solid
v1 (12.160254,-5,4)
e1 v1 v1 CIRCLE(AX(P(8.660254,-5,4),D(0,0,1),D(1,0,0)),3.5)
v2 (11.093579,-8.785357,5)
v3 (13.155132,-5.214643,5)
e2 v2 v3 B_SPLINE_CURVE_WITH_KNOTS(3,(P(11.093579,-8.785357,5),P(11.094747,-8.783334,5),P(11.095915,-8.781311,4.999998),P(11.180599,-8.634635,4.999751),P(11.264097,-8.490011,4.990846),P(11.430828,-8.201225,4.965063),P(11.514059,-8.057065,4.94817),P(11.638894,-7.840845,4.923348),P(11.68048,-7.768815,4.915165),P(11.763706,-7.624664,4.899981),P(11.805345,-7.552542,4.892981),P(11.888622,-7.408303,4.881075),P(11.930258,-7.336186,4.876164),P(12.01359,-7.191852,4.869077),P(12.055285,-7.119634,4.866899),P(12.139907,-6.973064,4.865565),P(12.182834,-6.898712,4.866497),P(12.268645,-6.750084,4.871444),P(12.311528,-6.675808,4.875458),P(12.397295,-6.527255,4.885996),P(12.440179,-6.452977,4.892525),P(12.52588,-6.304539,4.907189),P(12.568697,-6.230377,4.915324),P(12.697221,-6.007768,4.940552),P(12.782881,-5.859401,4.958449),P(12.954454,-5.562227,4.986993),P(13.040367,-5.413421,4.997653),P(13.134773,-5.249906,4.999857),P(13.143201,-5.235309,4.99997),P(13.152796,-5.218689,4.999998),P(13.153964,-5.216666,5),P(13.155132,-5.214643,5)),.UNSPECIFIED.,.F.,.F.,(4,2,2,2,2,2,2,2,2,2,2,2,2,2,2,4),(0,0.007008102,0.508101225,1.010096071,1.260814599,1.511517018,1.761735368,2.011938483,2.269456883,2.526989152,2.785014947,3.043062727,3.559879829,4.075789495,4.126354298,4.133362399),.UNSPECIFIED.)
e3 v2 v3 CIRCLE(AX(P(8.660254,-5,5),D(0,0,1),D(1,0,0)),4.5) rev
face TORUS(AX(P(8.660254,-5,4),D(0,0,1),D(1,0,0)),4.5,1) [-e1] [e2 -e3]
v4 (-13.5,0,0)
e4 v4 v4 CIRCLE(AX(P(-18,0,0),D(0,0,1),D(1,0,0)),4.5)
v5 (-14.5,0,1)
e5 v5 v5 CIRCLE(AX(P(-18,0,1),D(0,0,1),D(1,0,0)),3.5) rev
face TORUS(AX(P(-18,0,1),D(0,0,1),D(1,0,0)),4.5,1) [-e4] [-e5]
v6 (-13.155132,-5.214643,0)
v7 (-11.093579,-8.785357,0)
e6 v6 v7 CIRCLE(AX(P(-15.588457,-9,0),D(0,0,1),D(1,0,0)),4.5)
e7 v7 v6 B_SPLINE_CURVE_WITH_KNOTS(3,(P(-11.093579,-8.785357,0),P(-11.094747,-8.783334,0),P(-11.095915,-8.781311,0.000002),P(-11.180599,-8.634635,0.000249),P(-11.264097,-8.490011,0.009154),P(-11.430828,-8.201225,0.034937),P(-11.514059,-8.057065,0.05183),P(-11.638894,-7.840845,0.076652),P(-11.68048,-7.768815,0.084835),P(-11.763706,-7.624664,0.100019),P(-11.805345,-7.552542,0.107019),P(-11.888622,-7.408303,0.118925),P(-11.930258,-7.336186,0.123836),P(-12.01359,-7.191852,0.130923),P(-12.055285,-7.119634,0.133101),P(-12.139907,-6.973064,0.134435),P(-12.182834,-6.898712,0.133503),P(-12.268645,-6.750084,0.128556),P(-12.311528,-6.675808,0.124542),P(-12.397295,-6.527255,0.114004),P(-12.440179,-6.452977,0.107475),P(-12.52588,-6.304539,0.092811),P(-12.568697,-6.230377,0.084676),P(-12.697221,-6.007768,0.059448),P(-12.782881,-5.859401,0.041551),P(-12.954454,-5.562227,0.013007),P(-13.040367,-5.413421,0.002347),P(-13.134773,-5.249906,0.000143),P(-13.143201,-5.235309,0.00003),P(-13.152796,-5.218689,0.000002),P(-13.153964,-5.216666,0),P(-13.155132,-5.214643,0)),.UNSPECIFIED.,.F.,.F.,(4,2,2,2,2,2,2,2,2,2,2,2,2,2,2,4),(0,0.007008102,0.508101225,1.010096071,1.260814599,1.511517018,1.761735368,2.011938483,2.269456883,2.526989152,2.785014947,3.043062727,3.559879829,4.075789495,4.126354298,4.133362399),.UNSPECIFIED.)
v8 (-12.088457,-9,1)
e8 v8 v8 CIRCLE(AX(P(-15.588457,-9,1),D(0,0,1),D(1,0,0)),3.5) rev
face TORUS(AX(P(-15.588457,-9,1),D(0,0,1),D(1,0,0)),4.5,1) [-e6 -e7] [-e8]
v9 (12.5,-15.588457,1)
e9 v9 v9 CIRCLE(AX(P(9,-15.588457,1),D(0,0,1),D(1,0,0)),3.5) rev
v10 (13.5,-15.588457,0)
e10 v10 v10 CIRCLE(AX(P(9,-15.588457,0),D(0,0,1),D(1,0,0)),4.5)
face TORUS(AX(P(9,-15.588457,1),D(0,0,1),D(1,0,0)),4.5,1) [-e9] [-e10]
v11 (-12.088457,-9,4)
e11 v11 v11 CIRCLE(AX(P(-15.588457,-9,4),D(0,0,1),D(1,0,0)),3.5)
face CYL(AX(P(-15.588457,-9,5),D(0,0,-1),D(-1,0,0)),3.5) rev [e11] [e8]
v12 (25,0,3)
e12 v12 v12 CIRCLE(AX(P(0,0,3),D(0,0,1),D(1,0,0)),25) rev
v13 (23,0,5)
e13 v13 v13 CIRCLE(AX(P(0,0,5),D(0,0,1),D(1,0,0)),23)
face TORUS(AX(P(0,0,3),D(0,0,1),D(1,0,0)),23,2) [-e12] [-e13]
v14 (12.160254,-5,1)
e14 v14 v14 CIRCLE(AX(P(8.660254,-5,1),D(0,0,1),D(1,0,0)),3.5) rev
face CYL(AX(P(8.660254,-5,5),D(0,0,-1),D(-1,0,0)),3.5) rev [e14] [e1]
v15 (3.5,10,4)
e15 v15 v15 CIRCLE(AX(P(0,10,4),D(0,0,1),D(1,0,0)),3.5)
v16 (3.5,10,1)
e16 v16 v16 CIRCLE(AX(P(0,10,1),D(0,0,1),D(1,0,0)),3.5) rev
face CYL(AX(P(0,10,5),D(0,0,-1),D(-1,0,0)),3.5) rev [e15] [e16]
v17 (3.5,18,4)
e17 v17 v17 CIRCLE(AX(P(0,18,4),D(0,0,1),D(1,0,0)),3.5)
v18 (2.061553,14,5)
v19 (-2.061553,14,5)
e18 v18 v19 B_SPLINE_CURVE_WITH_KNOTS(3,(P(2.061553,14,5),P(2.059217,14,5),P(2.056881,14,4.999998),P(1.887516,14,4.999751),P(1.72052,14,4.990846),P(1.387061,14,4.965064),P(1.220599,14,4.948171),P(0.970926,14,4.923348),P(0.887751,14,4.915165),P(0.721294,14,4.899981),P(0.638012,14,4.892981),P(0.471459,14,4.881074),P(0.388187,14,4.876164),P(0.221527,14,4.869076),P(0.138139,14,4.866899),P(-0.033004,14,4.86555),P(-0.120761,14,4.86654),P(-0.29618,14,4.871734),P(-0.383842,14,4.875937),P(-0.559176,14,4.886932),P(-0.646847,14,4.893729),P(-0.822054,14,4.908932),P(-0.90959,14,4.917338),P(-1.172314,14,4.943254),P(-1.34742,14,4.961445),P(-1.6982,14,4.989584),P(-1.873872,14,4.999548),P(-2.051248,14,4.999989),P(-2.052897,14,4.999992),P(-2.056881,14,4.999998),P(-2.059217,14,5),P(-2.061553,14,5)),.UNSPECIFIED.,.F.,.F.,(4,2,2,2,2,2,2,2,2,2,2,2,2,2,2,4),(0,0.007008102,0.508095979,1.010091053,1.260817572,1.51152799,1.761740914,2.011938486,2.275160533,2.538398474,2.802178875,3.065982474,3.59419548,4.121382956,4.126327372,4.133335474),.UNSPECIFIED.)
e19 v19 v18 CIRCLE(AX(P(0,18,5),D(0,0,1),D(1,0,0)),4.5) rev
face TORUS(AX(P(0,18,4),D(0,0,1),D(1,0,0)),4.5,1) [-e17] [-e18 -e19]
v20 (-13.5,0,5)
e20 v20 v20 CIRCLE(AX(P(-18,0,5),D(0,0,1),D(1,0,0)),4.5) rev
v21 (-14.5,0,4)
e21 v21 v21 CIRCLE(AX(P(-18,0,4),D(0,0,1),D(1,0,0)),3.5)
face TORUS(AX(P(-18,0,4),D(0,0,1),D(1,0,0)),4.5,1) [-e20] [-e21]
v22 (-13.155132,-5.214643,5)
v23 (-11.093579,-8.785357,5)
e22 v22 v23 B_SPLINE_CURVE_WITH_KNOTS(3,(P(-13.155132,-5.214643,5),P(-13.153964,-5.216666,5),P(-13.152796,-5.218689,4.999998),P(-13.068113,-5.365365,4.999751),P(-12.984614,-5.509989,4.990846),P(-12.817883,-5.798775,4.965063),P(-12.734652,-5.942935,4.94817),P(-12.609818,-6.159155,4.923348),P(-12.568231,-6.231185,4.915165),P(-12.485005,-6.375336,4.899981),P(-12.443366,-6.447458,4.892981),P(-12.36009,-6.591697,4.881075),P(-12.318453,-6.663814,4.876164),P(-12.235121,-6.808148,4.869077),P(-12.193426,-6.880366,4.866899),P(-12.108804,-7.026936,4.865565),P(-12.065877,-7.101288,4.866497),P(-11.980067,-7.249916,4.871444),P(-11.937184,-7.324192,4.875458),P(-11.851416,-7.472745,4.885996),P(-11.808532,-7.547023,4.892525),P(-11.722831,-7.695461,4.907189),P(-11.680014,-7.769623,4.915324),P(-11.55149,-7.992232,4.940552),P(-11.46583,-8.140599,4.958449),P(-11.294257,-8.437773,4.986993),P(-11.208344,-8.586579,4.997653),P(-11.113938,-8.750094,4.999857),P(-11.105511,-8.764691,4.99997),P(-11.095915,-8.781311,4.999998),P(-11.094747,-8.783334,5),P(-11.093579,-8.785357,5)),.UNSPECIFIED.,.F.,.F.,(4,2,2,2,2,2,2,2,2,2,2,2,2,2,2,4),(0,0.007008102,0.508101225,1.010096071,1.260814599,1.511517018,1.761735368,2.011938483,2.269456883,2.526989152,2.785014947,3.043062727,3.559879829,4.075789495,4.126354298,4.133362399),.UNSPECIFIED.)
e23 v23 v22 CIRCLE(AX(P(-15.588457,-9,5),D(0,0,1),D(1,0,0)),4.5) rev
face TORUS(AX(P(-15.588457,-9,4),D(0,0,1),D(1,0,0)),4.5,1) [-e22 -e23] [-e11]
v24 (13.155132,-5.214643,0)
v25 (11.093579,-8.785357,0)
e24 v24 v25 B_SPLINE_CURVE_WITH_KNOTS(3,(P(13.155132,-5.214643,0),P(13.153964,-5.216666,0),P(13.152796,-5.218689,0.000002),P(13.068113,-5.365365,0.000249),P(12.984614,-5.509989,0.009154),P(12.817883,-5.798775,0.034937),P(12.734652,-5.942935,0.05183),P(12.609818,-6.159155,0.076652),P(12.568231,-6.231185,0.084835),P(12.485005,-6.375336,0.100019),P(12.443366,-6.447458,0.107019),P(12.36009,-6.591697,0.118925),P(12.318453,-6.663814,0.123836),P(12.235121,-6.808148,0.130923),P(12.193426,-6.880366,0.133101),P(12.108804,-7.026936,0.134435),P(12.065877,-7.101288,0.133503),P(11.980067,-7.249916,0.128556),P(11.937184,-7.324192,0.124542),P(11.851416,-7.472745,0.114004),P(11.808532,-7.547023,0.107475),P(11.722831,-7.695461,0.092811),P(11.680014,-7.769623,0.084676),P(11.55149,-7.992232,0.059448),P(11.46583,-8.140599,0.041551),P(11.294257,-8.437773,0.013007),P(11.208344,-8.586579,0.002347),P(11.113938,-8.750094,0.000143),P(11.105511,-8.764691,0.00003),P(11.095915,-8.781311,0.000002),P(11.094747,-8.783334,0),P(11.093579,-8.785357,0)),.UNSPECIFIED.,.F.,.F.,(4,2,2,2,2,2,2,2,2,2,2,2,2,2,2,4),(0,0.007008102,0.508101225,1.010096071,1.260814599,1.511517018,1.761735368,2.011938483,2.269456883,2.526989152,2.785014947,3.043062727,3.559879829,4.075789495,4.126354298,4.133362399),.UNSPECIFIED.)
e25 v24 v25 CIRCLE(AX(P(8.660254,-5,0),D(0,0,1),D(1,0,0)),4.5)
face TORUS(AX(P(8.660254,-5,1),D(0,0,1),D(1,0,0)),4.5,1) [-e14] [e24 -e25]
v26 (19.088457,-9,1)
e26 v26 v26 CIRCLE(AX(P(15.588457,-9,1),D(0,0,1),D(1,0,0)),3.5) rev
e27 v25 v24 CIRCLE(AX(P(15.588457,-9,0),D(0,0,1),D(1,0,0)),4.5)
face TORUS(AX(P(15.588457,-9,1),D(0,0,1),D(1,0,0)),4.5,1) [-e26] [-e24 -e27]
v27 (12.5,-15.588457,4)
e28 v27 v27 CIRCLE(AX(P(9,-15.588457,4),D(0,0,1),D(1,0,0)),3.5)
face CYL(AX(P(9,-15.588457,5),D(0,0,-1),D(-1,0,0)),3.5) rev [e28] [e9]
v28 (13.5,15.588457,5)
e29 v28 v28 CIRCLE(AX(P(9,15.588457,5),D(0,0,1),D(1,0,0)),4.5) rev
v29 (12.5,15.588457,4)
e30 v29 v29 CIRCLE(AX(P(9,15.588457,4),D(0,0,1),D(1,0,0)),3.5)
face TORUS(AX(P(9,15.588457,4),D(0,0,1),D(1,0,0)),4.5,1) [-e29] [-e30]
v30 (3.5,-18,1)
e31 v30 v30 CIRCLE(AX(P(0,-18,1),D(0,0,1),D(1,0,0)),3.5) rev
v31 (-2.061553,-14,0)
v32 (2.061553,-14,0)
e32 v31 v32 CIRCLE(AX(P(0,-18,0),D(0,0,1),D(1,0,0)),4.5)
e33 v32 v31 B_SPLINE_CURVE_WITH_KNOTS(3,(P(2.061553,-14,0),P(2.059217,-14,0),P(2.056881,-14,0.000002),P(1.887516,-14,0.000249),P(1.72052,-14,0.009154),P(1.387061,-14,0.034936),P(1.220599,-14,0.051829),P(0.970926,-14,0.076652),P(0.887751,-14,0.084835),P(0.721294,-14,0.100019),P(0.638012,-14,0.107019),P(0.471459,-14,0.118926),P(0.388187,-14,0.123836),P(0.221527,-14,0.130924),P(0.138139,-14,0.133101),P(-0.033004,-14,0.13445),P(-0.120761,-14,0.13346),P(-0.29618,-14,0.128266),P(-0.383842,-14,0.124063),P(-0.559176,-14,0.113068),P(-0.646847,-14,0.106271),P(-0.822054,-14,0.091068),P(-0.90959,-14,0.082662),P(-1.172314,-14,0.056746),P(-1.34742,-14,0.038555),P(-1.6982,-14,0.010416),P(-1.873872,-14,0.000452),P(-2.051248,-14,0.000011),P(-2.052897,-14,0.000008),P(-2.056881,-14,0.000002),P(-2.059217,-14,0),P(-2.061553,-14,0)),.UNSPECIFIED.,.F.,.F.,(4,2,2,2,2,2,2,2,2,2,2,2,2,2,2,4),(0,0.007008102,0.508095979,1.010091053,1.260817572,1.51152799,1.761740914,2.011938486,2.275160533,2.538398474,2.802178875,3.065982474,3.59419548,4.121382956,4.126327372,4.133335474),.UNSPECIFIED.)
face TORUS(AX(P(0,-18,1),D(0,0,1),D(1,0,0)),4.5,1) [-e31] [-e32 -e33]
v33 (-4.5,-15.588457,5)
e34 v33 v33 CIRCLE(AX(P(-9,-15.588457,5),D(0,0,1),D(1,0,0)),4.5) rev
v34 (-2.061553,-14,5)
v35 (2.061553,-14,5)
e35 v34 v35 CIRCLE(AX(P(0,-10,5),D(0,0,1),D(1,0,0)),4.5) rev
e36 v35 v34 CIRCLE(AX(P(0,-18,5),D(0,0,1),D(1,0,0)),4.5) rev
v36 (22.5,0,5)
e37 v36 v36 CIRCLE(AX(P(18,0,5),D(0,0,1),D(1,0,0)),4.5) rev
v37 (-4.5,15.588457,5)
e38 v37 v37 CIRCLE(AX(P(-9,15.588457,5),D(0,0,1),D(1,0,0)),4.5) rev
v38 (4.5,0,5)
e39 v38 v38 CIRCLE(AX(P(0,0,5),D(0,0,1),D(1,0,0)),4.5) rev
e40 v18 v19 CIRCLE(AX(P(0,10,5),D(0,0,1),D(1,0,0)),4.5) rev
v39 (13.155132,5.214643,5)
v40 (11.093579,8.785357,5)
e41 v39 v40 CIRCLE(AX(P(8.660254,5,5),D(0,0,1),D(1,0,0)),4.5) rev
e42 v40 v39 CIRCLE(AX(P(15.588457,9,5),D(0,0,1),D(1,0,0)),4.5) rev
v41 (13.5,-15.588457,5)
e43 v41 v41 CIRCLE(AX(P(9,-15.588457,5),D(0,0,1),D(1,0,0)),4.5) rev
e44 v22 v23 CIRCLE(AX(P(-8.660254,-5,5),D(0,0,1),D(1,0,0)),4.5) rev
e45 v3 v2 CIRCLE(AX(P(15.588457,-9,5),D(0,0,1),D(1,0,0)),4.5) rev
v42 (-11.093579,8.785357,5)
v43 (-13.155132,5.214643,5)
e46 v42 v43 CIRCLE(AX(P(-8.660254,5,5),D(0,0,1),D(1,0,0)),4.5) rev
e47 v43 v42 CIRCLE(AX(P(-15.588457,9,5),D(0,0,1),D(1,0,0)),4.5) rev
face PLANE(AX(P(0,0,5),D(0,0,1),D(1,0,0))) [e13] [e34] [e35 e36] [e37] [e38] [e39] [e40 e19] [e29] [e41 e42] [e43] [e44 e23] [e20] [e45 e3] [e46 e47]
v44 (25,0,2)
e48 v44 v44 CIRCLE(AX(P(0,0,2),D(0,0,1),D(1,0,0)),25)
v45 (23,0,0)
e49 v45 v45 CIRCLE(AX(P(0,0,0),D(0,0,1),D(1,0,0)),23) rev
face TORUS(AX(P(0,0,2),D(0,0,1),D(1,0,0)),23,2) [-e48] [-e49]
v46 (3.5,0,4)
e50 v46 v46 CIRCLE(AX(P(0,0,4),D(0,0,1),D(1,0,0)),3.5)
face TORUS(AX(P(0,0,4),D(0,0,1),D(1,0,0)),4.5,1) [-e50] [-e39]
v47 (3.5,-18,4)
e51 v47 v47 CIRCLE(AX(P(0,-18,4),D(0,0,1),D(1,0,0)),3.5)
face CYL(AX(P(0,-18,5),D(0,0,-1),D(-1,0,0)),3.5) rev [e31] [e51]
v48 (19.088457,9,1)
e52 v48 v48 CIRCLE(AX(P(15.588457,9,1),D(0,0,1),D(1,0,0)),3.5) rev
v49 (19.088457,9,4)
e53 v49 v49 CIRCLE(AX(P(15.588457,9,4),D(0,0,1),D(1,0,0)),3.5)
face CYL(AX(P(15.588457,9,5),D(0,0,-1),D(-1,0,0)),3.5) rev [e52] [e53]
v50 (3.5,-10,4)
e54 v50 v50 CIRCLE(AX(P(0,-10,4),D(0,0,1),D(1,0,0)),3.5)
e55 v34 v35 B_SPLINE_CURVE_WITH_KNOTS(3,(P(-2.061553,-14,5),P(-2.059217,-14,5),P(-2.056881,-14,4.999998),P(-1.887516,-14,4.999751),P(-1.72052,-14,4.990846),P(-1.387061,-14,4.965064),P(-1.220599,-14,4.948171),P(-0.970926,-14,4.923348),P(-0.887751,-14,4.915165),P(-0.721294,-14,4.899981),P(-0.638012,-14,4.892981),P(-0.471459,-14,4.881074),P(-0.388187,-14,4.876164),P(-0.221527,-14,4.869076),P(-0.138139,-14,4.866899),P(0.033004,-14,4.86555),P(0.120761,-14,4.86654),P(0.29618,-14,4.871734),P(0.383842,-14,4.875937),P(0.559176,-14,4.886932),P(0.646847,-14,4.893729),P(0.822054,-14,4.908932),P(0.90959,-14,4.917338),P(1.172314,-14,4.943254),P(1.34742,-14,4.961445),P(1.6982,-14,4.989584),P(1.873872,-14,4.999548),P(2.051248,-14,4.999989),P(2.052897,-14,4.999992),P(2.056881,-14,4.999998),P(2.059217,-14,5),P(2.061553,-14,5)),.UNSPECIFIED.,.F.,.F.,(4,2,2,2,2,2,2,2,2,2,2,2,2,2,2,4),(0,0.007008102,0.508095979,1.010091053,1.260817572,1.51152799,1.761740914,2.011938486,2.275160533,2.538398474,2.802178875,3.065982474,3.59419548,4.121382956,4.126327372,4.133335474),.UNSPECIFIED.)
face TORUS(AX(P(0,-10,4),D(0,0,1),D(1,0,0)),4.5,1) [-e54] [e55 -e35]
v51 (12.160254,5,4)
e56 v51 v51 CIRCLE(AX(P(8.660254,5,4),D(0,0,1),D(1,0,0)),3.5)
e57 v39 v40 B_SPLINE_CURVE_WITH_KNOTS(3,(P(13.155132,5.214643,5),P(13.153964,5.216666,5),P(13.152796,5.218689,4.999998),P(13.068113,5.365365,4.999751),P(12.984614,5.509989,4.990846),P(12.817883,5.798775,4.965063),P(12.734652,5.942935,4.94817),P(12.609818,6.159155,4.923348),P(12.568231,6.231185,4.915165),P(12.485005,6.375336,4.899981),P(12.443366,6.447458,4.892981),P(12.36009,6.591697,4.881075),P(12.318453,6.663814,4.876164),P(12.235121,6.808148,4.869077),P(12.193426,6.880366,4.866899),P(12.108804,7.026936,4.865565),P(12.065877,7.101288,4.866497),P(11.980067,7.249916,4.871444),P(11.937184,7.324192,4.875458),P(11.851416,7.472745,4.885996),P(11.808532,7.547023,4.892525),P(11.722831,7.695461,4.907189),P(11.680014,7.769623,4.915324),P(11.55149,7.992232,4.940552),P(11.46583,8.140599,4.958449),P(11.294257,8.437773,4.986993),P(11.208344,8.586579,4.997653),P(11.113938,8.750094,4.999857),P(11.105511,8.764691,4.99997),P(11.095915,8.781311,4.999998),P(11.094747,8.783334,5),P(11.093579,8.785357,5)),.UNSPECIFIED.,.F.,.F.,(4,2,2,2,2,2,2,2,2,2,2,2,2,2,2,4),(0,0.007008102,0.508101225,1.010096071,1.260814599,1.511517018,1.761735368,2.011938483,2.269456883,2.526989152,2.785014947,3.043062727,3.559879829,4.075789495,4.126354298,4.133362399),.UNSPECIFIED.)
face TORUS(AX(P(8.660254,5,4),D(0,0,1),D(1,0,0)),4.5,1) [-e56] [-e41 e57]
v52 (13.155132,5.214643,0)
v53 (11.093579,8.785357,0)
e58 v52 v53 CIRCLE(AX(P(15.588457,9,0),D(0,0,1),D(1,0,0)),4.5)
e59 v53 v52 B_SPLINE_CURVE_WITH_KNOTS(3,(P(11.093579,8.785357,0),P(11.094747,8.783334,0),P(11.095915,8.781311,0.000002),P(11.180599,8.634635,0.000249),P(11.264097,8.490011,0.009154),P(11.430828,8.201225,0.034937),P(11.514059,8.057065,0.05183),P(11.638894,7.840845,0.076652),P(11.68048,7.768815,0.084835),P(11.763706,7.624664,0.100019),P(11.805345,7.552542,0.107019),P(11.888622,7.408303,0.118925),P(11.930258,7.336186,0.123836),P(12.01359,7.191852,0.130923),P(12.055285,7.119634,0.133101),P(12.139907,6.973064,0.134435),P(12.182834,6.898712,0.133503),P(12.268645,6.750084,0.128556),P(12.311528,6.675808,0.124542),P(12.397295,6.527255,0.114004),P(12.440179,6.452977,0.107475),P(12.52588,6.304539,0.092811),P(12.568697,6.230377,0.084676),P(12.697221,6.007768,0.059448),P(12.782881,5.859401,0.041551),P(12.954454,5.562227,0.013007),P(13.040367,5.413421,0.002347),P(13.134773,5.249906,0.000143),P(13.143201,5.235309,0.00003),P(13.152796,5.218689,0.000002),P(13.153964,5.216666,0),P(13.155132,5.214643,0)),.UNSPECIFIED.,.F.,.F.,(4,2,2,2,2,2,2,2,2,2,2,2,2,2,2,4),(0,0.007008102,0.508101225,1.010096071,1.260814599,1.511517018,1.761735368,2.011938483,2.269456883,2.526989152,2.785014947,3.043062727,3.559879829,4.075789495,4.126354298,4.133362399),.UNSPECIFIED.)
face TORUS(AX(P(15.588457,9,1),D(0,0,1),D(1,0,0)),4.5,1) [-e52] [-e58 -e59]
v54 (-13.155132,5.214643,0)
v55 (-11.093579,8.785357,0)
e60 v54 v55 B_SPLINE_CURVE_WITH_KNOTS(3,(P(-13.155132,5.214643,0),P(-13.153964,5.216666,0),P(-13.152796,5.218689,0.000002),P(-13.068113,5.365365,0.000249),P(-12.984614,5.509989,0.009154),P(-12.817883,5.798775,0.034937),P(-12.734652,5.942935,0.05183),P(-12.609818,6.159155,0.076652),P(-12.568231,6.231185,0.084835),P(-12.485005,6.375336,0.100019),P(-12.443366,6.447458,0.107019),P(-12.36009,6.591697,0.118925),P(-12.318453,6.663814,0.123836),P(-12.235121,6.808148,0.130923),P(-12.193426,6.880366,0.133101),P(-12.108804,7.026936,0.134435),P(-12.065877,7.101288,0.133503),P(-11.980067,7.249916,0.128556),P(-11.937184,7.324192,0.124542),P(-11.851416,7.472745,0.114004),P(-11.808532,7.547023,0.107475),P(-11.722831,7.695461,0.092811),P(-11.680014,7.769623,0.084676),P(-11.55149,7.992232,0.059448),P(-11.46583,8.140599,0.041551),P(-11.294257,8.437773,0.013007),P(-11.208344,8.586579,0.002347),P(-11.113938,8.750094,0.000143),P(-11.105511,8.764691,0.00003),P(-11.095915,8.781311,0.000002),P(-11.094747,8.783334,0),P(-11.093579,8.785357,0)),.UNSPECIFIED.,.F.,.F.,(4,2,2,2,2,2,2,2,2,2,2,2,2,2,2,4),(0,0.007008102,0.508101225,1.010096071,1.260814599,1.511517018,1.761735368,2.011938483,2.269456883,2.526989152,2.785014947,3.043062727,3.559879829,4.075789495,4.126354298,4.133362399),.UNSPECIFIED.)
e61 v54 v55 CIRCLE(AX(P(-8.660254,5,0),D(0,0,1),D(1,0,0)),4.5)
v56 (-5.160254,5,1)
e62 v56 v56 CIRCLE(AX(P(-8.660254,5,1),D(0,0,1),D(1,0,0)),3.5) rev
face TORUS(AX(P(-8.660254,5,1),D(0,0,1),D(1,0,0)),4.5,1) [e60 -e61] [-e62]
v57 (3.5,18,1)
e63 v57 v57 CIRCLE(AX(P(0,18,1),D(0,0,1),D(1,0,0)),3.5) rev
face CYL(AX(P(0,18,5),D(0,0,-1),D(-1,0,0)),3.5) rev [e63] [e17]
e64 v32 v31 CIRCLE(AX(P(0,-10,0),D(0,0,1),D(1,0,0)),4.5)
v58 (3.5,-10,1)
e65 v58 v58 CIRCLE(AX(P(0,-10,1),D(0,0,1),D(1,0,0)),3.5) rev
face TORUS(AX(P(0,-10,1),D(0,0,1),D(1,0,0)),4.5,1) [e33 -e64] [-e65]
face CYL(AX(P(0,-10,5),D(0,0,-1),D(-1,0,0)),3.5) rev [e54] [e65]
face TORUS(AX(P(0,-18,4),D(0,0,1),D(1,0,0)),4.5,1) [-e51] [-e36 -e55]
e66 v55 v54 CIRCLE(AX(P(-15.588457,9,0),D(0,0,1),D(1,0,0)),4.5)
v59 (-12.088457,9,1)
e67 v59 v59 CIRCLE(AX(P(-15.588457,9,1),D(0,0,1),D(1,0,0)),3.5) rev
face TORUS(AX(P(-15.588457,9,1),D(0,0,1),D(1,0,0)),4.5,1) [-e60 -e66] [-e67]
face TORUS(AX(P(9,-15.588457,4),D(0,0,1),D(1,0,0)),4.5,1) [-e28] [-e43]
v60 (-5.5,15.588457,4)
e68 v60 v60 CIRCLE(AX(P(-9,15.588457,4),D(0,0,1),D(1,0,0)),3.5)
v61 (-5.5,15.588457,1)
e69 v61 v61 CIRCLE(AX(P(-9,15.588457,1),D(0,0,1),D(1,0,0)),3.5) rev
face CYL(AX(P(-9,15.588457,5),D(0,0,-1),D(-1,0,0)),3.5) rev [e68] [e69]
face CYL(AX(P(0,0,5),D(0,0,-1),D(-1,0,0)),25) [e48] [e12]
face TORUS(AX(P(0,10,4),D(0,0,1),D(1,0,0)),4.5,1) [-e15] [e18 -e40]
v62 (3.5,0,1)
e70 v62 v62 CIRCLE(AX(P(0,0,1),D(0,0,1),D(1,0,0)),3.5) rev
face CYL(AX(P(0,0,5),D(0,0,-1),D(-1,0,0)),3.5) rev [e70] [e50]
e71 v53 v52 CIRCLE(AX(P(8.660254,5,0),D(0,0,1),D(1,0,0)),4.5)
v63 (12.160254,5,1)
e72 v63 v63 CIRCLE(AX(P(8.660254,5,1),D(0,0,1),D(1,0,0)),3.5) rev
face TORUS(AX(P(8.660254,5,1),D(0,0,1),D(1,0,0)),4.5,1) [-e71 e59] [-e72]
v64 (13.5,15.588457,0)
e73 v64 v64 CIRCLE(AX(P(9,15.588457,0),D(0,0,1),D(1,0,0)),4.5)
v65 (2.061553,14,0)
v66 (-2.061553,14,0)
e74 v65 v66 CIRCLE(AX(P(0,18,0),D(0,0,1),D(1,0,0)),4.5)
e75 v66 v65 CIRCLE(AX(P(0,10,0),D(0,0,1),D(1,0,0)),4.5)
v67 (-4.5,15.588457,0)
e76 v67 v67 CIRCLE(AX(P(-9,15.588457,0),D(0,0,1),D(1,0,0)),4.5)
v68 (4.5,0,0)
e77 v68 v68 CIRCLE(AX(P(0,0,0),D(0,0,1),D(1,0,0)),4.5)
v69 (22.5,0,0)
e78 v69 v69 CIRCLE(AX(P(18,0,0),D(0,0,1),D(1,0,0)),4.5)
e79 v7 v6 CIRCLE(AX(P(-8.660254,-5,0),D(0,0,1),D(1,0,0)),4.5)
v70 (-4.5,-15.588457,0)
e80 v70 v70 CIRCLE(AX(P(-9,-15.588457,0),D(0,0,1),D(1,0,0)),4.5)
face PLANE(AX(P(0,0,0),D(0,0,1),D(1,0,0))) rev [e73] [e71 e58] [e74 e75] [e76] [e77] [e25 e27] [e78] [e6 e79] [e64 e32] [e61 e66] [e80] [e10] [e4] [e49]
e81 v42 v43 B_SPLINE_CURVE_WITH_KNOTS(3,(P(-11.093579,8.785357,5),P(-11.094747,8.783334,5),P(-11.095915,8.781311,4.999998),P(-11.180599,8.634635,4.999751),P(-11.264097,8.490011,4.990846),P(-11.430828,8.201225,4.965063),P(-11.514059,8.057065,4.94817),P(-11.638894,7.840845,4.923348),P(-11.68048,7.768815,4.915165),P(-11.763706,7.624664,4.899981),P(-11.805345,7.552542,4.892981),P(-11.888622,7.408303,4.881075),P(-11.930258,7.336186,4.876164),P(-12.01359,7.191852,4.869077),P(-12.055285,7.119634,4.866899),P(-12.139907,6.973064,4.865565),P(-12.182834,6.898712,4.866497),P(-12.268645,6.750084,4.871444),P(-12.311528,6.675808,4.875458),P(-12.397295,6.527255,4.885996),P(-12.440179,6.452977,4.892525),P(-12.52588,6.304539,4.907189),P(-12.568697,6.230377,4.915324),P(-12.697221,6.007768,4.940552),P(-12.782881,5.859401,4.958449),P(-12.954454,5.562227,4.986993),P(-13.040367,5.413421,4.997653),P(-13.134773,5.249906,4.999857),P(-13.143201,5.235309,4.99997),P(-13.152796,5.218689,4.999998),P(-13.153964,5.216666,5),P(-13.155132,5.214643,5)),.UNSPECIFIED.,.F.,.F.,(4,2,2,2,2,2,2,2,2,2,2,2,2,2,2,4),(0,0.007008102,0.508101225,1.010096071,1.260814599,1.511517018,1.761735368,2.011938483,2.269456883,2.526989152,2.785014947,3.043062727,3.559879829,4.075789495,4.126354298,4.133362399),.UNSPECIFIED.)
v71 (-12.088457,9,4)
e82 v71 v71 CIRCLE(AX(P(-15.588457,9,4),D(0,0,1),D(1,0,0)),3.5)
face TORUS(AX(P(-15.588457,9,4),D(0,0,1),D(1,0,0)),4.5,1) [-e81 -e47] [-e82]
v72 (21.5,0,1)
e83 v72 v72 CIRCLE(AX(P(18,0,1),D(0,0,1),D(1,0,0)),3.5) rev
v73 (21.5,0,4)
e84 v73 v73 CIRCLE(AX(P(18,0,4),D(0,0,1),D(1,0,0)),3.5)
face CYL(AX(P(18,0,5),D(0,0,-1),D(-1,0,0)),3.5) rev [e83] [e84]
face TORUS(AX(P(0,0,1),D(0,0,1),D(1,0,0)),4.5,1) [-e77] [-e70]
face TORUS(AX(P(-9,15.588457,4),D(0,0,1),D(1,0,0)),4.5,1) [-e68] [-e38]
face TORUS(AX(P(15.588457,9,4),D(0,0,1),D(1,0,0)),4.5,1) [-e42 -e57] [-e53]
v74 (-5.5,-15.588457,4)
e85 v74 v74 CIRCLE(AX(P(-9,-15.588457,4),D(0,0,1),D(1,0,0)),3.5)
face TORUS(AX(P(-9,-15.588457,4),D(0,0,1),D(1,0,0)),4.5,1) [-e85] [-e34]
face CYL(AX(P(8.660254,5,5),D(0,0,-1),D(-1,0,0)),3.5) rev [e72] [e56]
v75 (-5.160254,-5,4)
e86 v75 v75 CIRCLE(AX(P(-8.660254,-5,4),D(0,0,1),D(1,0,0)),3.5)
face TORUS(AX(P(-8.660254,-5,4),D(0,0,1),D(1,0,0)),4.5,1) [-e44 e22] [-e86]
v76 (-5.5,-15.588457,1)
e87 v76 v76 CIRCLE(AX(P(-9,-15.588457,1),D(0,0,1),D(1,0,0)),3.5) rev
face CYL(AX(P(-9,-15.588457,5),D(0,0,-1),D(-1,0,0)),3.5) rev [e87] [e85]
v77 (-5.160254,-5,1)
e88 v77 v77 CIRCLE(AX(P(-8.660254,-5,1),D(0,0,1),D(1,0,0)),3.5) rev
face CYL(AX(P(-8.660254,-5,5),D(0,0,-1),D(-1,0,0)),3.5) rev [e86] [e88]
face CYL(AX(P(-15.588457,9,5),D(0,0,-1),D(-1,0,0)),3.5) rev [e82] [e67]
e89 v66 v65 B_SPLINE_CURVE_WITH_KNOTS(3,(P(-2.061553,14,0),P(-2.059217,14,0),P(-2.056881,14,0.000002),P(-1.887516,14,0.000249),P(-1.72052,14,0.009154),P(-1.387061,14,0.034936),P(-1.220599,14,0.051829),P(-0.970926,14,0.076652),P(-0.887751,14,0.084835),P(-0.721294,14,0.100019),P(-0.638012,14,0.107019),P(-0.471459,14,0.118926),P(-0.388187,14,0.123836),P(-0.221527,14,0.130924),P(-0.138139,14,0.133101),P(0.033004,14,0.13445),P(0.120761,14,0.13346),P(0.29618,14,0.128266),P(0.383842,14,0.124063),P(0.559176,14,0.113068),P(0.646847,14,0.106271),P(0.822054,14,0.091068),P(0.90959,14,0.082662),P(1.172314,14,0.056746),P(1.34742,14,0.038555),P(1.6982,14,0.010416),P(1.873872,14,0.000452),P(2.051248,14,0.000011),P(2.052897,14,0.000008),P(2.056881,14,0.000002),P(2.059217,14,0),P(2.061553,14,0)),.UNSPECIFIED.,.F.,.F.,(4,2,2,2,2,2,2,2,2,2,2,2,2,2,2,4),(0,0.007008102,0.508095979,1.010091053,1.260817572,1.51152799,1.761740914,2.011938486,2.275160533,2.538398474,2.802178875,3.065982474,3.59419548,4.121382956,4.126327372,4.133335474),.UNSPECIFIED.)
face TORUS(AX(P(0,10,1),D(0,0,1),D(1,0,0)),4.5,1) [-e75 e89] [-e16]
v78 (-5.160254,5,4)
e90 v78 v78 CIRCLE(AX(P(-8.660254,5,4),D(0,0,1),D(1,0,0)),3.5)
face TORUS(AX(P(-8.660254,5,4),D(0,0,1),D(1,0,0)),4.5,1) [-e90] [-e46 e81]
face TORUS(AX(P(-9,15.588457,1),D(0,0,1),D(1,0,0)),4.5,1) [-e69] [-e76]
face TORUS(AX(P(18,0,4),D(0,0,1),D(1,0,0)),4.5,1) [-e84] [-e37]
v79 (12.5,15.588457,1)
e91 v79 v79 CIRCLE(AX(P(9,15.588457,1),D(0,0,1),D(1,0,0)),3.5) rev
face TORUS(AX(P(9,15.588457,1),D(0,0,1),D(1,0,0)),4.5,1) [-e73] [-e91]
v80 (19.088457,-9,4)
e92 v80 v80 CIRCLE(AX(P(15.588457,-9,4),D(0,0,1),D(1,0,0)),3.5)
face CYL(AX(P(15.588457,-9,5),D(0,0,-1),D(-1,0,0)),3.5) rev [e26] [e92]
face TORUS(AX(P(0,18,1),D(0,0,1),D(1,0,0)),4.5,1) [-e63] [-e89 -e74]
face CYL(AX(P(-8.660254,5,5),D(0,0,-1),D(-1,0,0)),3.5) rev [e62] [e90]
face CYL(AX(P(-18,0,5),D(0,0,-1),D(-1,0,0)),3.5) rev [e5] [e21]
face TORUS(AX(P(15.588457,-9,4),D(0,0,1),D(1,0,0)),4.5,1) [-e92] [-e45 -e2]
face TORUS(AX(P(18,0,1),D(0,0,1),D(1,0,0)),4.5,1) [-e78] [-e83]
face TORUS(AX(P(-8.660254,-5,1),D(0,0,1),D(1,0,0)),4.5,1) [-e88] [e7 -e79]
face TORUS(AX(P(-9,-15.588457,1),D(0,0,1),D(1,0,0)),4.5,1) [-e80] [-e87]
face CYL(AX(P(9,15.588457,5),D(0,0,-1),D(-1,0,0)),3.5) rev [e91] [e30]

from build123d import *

# Parameters (mm, degrees)
SKETCH1_R           = 25
SKETCH1_R_2         = 22.5
SKETCH1_R_3         = 3.5
BOSS_EXTRUDE5_DEPTH = 5
FILLET10_R          = 2
FILLET11_R          = 1


with BuildPart() as part:
    # Sketch1 → Boss-Extrude5 (new body)
    # profile 1 of 2: a face of its own
    with BuildSketch(Plane.XY):
        Circle(SKETCH1_R)
        Circle(SKETCH1_R_2, mode=Mode.SUBTRACT)
    # profile 2 of 2: a face of its own
    with BuildSketch(Plane.XY):
        Circle(SKETCH1_R_2)
        with Locations((-15.588457268, -9)):
            Circle(SKETCH1_R_3, mode=Mode.SUBTRACT)
        with Locations((-9, -15.588457268)):
            Circle(SKETCH1_R_3, mode=Mode.SUBTRACT)
        with Locations((0, -18)):
            Circle(SKETCH1_R_3, mode=Mode.SUBTRACT)
        with Locations((9, -15.588457268)):
            Circle(SKETCH1_R_3, mode=Mode.SUBTRACT)
        with Locations((15.588457268, -9)):
            Circle(SKETCH1_R_3, mode=Mode.SUBTRACT)
        with Locations((18, 0)):
            Circle(SKETCH1_R_3, mode=Mode.SUBTRACT)
        with Locations((15.588457268, 9)):
            Circle(SKETCH1_R_3, mode=Mode.SUBTRACT)
        with Locations((9, 15.588457268)):
            Circle(SKETCH1_R_3, mode=Mode.SUBTRACT)
        with Locations((0, 18)):
            Circle(SKETCH1_R_3, mode=Mode.SUBTRACT)
        with Locations((-9, 15.588457268)):
            Circle(SKETCH1_R_3, mode=Mode.SUBTRACT)
        with Locations((-15.588457268, 9)):
            Circle(SKETCH1_R_3, mode=Mode.SUBTRACT)
        with Locations((-18, 0)):
            Circle(SKETCH1_R_3, mode=Mode.SUBTRACT)
        with Locations((-8.660254038, 5)):
            Circle(SKETCH1_R_3, mode=Mode.SUBTRACT)
        with Locations((-8.660254038, -5)):
            Circle(SKETCH1_R_3, mode=Mode.SUBTRACT)
        with Locations((0, -10)):
            Circle(SKETCH1_R_3, mode=Mode.SUBTRACT)
        with Locations((8.660254038, -5)):
            Circle(SKETCH1_R_3, mode=Mode.SUBTRACT)
        with Locations((8.660254038, 5)):
            Circle(SKETCH1_R_3, mode=Mode.SUBTRACT)
        Circle(SKETCH1_R_3, mode=Mode.SUBTRACT)
        with Locations((0, 10)):
            Circle(SKETCH1_R_3, mode=Mode.SUBTRACT)
    extrude(amount=BOSS_EXTRUDE5_DEPTH)

    # Fillet10
    fillet10_edges = [part.edges().sort_by_distance(p)[0] for p in [
        (-25, 0, 0),
        (-25, 0, 5),
    ]]
    fillet(fillet10_edges, radius=FILLET10_R)

    # Fillet11
    # the kernel refuses this fillet: 1 mm, written as the material it takes off along each edge
    with BuildSketch(Plane(origin=(-15.588457268, -9, 5), x_dir=(1, 0, 0), z_dir=(0, -1, 0))) as fillet11_piece_1:
        with BuildLine():
            CenterArc((3.5 + FILLET11_R, -FILLET11_R), FILLET11_R, 90, 90)
            Line((3.5, -FILLET11_R), (3.5, 0))
            Line((3.5, 0), (3.5 + FILLET11_R, 0))
        make_face()
    revolve(axis=Axis((-15.588457268, -9, 5), (0, 0, 1)), mode=Mode.SUBTRACT)
    with BuildSketch(Plane(origin=(0, 10, 0), x_dir=(1, 0, 0), z_dir=(0, -1, 0))) as fillet11_piece_2:
        with BuildLine():
            CenterArc((3.5 + FILLET11_R, FILLET11_R), FILLET11_R, 180, 90)
            Line((3.5, FILLET11_R), (3.5, 0))
            Line((3.5, 0), (3.5 + FILLET11_R, 0))
        make_face()
    revolve(axis=Axis((0, 10, 0), (0, 0, 1)), mode=Mode.SUBTRACT)
    with BuildSketch(Plane(origin=(0, 0, 0), x_dir=(1, 0, 0), z_dir=(0, -1, 0))) as fillet11_piece_3:
        with BuildLine():
            CenterArc((3.5 + FILLET11_R, FILLET11_R), FILLET11_R, 180, 90)
            Line((3.5, FILLET11_R), (3.5, 0))
            Line((3.5, 0), (3.5 + FILLET11_R, 0))
        make_face()
    revolve(axis=Axis((0, 0, 0), (0, 0, 1)), mode=Mode.SUBTRACT)
    with BuildSketch(Plane(origin=(8.660254038, 5, 0), x_dir=(1, 0, 0), z_dir=(0, -1, 0))) as fillet11_piece_4:
        with BuildLine():
            CenterArc((3.5 + FILLET11_R, FILLET11_R), FILLET11_R, 180, 90)
            Line((3.5, FILLET11_R), (3.5, 0))
            Line((3.5, 0), (3.5 + FILLET11_R, 0))
        make_face()
    revolve(axis=Axis((8.660254038, 5, 0), (0, 0, 1)), mode=Mode.SUBTRACT)
    with BuildSketch(Plane(origin=(8.660254038, -5, 0), x_dir=(1, 0, 0), z_dir=(0, -1, 0))) as fillet11_piece_5:
        with BuildLine():
            CenterArc((3.5 + FILLET11_R, FILLET11_R), FILLET11_R, 180, 90)
            Line((3.5, FILLET11_R), (3.5, 0))
            Line((3.5, 0), (3.5 + FILLET11_R, 0))
        make_face()
    revolve(axis=Axis((8.660254038, -5, 0), (0, 0, 1)), mode=Mode.SUBTRACT)
    with BuildSketch(Plane(origin=(0, -10, 0), x_dir=(1, 0, 0), z_dir=(0, -1, 0))) as fillet11_piece_6:
        with BuildLine():
            CenterArc((3.5 + FILLET11_R, FILLET11_R), FILLET11_R, 180, 90)
            Line((3.5, FILLET11_R), (3.5, 0))
            Line((3.5, 0), (3.5 + FILLET11_R, 0))
        make_face()
    revolve(axis=Axis((0, -10, 0), (0, 0, 1)), mode=Mode.SUBTRACT)
    with BuildSketch(Plane(origin=(-8.660254038, -5, 0), x_dir=(1, 0, 0), z_dir=(0, -1, 0))) as fillet11_piece_7:
        with BuildLine():
            CenterArc((3.5 + FILLET11_R, FILLET11_R), FILLET11_R, 180, 90)
            Line((3.5, FILLET11_R), (3.5, 0))
            Line((3.5, 0), (3.5 + FILLET11_R, 0))
        make_face()
    revolve(axis=Axis((-8.660254038, -5, 0), (0, 0, 1)), mode=Mode.SUBTRACT)
    with BuildSketch(Plane(origin=(-8.660254038, 5, 0), x_dir=(1, 0, 0), z_dir=(0, -1, 0))) as fillet11_piece_8:
        with BuildLine():
            CenterArc((3.5 + FILLET11_R, FILLET11_R), FILLET11_R, 180, 90)
            Line((3.5, FILLET11_R), (3.5, 0))
            Line((3.5, 0), (3.5 + FILLET11_R, 0))
        make_face()
    revolve(axis=Axis((-8.660254038, 5, 0), (0, 0, 1)), mode=Mode.SUBTRACT)
    with BuildSketch(Plane(origin=(-18, 0, 0), x_dir=(1, 0, 0), z_dir=(0, -1, 0))) as fillet11_piece_9:
        with BuildLine():
            CenterArc((3.5 + FILLET11_R, FILLET11_R), FILLET11_R, 180, 90)
            Line((3.5, FILLET11_R), (3.5, 0))
            Line((3.5, 0), (3.5 + FILLET11_R, 0))
        make_face()
    revolve(axis=Axis((-18, 0, 0), (0, 0, 1)), mode=Mode.SUBTRACT)
    with BuildSketch(Plane(origin=(-9, -15.588457268, 5), x_dir=(1, 0, 0), z_dir=(0, -1, 0))) as fillet11_piece_10:
        with BuildLine():
            CenterArc((3.5 + FILLET11_R, -FILLET11_R), FILLET11_R, 90, 90)
            Line((3.5, -FILLET11_R), (3.5, 0))
            Line((3.5, 0), (3.5 + FILLET11_R, 0))
        make_face()
    revolve(axis=Axis((-9, -15.588457268, 5), (0, 0, 1)), mode=Mode.SUBTRACT)
    with BuildSketch(Plane(origin=(-15.588457268, 9, 0), x_dir=(1, 0, 0), z_dir=(0, -1, 0))) as fillet11_piece_11:
        with BuildLine():
            CenterArc((3.5 + FILLET11_R, FILLET11_R), FILLET11_R, 180, 90)
            Line((3.5, FILLET11_R), (3.5, 0))
            Line((3.5, 0), (3.5 + FILLET11_R, 0))
        make_face()
    revolve(axis=Axis((-15.588457268, 9, 0), (0, 0, 1)), mode=Mode.SUBTRACT)
    with BuildSketch(Plane(origin=(-9, 15.588457268, 0), x_dir=(1, 0, 0), z_dir=(0, -1, 0))) as fillet11_piece_12:
        with BuildLine():
            CenterArc((3.5 + FILLET11_R, FILLET11_R), FILLET11_R, 180, 90)
            Line((3.5, FILLET11_R), (3.5, 0))
            Line((3.5, 0), (3.5 + FILLET11_R, 0))
        make_face()
    revolve(axis=Axis((-9, 15.588457268, 0), (0, 0, 1)), mode=Mode.SUBTRACT)
    with BuildSketch(Plane(origin=(0, 18, 0), x_dir=(1, 0, 0), z_dir=(0, -1, 0))) as fillet11_piece_13:
        with BuildLine():
            CenterArc((3.5 + FILLET11_R, FILLET11_R), FILLET11_R, 180, 90)
            Line((3.5, FILLET11_R), (3.5, 0))
            Line((3.5, 0), (3.5 + FILLET11_R, 0))
        make_face()
    revolve(axis=Axis((0, 18, 0), (0, 0, 1)), mode=Mode.SUBTRACT)
    with BuildSketch(Plane(origin=(9, 15.588457268, 0), x_dir=(1, 0, 0), z_dir=(0, -1, 0))) as fillet11_piece_14:
        with BuildLine():
            CenterArc((3.5 + FILLET11_R, FILLET11_R), FILLET11_R, 180, 90)
            Line((3.5, FILLET11_R), (3.5, 0))
            Line((3.5, 0), (3.5 + FILLET11_R, 0))
        make_face()
    revolve(axis=Axis((9, 15.588457268, 0), (0, 0, 1)), mode=Mode.SUBTRACT)
    with BuildSketch(Plane(origin=(15.588457268, 9, 0), x_dir=(1, 0, 0), z_dir=(0, -1, 0))) as fillet11_piece_15:
        with BuildLine():
            CenterArc((3.5 + FILLET11_R, FILLET11_R), FILLET11_R, 180, 90)
            Line((3.5, FILLET11_R), (3.5, 0))
            Line((3.5, 0), (3.5 + FILLET11_R, 0))
        make_face()
    revolve(axis=Axis((15.588457268, 9, 0), (0, 0, 1)), mode=Mode.SUBTRACT)
    with BuildSketch(Plane(origin=(18, 0, 0), x_dir=(1, 0, 0), z_dir=(0, -1, 0))) as fillet11_piece_16:
        with BuildLine():
            CenterArc((3.5 + FILLET11_R, FILLET11_R), FILLET11_R, 180, 90)
            Line((3.5, FILLET11_R), (3.5, 0))
            Line((3.5, 0), (3.5 + FILLET11_R, 0))
        make_face()
    revolve(axis=Axis((18, 0, 0), (0, 0, 1)), mode=Mode.SUBTRACT)
    with BuildSketch(Plane(origin=(15.588457268, -9, 0), x_dir=(1, 0, 0), z_dir=(0, -1, 0))) as fillet11_piece_17:
        with BuildLine():
            CenterArc((3.5 + FILLET11_R, FILLET11_R), FILLET11_R, 180, 90)
            Line((3.5, FILLET11_R), (3.5, 0))
            Line((3.5, 0), (3.5 + FILLET11_R, 0))
        make_face()
    revolve(axis=Axis((15.588457268, -9, 0), (0, 0, 1)), mode=Mode.SUBTRACT)
    with BuildSketch(Plane(origin=(9, -15.588457268, 0), x_dir=(1, 0, 0), z_dir=(0, -1, 0))) as fillet11_piece_18:
        with BuildLine():
            CenterArc((3.5 + FILLET11_R, FILLET11_R), FILLET11_R, 180, 90)
            Line((3.5, FILLET11_R), (3.5, 0))
            Line((3.5, 0), (3.5 + FILLET11_R, 0))
        make_face()
    revolve(axis=Axis((9, -15.588457268, 0), (0, 0, 1)), mode=Mode.SUBTRACT)
    with BuildSketch(Plane(origin=(0, -18, 5), x_dir=(1, 0, 0), z_dir=(0, -1, 0))) as fillet11_piece_19:
        with BuildLine():
            CenterArc((3.5 + FILLET11_R, -FILLET11_R), FILLET11_R, 90, 90)
            Line((3.5, -FILLET11_R), (3.5, 0))
            Line((3.5, 0), (3.5 + FILLET11_R, 0))
        make_face()
    revolve(axis=Axis((0, -18, 5), (0, 0, 1)), mode=Mode.SUBTRACT)
    with BuildSketch(Plane(origin=(0, -18, 0), x_dir=(1, 0, 0), z_dir=(0, -1, 0))) as fillet11_piece_20:
        with BuildLine():
            CenterArc((3.5 + FILLET11_R, FILLET11_R), FILLET11_R, 180, 90)
            Line((3.5, FILLET11_R), (3.5, 0))
            Line((3.5, 0), (3.5 + FILLET11_R, 0))
        make_face()
    revolve(axis=Axis((0, -18, 0), (0, 0, 1)), mode=Mode.SUBTRACT)
    with BuildSketch(Plane(origin=(-9, -15.588457268, 0), x_dir=(1, 0, 0), z_dir=(0, -1, 0))) as fillet11_piece_21:
        with BuildLine():
            CenterArc((3.5 + FILLET11_R, FILLET11_R), FILLET11_R, 180, 90)
            Line((3.5, FILLET11_R), (3.5, 0))
            Line((3.5, 0), (3.5 + FILLET11_R, 0))
        make_face()
    revolve(axis=Axis((-9, -15.588457268, 0), (0, 0, 1)), mode=Mode.SUBTRACT)
    with BuildSketch(Plane(origin=(-15.588457268, -9, 0), x_dir=(1, 0, 0), z_dir=(0, -1, 0))) as fillet11_piece_22:
        with BuildLine():
            CenterArc((3.5 + FILLET11_R, FILLET11_R), FILLET11_R, 180, 90)
            Line((3.5, FILLET11_R), (3.5, 0))
            Line((3.5, 0), (3.5 + FILLET11_R, 0))
        make_face()
    revolve(axis=Axis((-15.588457268, -9, 0), (0, 0, 1)), mode=Mode.SUBTRACT)
    with BuildSketch(Plane(origin=(9, -15.588457268, 5), x_dir=(1, 0, 0), z_dir=(0, -1, 0))) as fillet11_piece_23:
        with BuildLine():
            CenterArc((3.5 + FILLET11_R, -FILLET11_R), FILLET11_R, 90, 90)
            Line((3.5, -FILLET11_R), (3.5, 0))
            Line((3.5, 0), (3.5 + FILLET11_R, 0))
        make_face()
    revolve(axis=Axis((9, -15.588457268, 5), (0, 0, 1)), mode=Mode.SUBTRACT)
    with BuildSketch(Plane(origin=(15.588457268, -9, 5), x_dir=(1, 0, 0), z_dir=(0, -1, 0))) as fillet11_piece_24:
        with BuildLine():
            CenterArc((3.5 + FILLET11_R, -FILLET11_R), FILLET11_R, 90, 90)
            Line((3.5, -FILLET11_R), (3.5, 0))
            Line((3.5, 0), (3.5 + FILLET11_R, 0))
        make_face()
    revolve(axis=Axis((15.588457268, -9, 5), (0, 0, 1)), mode=Mode.SUBTRACT)
    with BuildSketch(Plane(origin=(18, 0, 5), x_dir=(1, 0, 0), z_dir=(0, -1, 0))) as fillet11_piece_25:
        with BuildLine():
            CenterArc((3.5 + FILLET11_R, -FILLET11_R), FILLET11_R, 90, 90)
            Line((3.5, -FILLET11_R), (3.5, 0))
            Line((3.5, 0), (3.5 + FILLET11_R, 0))
        make_face()
    revolve(axis=Axis((18, 0, 5), (0, 0, 1)), mode=Mode.SUBTRACT)
    with BuildSketch(Plane(origin=(15.588457268, 9, 5), x_dir=(1, 0, 0), z_dir=(0, -1, 0))) as fillet11_piece_26:
        with BuildLine():
            CenterArc((3.5 + FILLET11_R, -FILLET11_R), FILLET11_R, 90, 90)
            Line((3.5, -FILLET11_R), (3.5, 0))
            Line((3.5, 0), (3.5 + FILLET11_R, 0))
        make_face()
    revolve(axis=Axis((15.588457268, 9, 5), (0, 0, 1)), mode=Mode.SUBTRACT)
    with BuildSketch(Plane(origin=(9, 15.588457268, 5), x_dir=(1, 0, 0), z_dir=(0, -1, 0))) as fillet11_piece_27:
        with BuildLine():
            CenterArc((3.5 + FILLET11_R, -FILLET11_R), FILLET11_R, 90, 90)
            Line((3.5, -FILLET11_R), (3.5, 0))
            Line((3.5, 0), (3.5 + FILLET11_R, 0))
        make_face()
    revolve(axis=Axis((9, 15.588457268, 5), (0, 0, 1)), mode=Mode.SUBTRACT)
    with BuildSketch(Plane(origin=(0, 18, 5), x_dir=(1, 0, 0), z_dir=(0, -1, 0))) as fillet11_piece_28:
        with BuildLine():
            CenterArc((3.5 + FILLET11_R, -FILLET11_R), FILLET11_R, 90, 90)
            Line((3.5, -FILLET11_R), (3.5, 0))
            Line((3.5, 0), (3.5 + FILLET11_R, 0))
        make_face()
    revolve(axis=Axis((0, 18, 5), (0, 0, 1)), mode=Mode.SUBTRACT)
    with BuildSketch(Plane(origin=(-9, 15.588457268, 5), x_dir=(1, 0, 0), z_dir=(0, -1, 0))) as fillet11_piece_29:
        with BuildLine():
            CenterArc((3.5 + FILLET11_R, -FILLET11_R), FILLET11_R, 90, 90)
            Line((3.5, -FILLET11_R), (3.5, 0))
            Line((3.5, 0), (3.5 + FILLET11_R, 0))
        make_face()
    revolve(axis=Axis((-9, 15.588457268, 5), (0, 0, 1)), mode=Mode.SUBTRACT)
    with BuildSketch(Plane(origin=(-15.588457268, 9, 5), x_dir=(1, 0, 0), z_dir=(0, -1, 0))) as fillet11_piece_30:
        with BuildLine():
            CenterArc((3.5 + FILLET11_R, -FILLET11_R), FILLET11_R, 90, 90)
            Line((3.5, -FILLET11_R), (3.5, 0))
            Line((3.5, 0), (3.5 + FILLET11_R, 0))
        make_face()
    revolve(axis=Axis((-15.588457268, 9, 5), (0, 0, 1)), mode=Mode.SUBTRACT)
    with BuildSketch(Plane(origin=(-18, 0, 5), x_dir=(1, 0, 0), z_dir=(0, -1, 0))) as fillet11_piece_31:
        with BuildLine():
            CenterArc((3.5 + FILLET11_R, -FILLET11_R), FILLET11_R, 90, 90)
            Line((3.5, -FILLET11_R), (3.5, 0))
            Line((3.5, 0), (3.5 + FILLET11_R, 0))
        make_face()
    revolve(axis=Axis((-18, 0, 5), (0, 0, 1)), mode=Mode.SUBTRACT)
    with BuildSketch(Plane(origin=(-8.660254038, 5, 5), x_dir=(1, 0, 0), z_dir=(0, -1, 0))) as fillet11_piece_32:
        with BuildLine():
            CenterArc((3.5 + FILLET11_R, -FILLET11_R), FILLET11_R, 90, 90)
            Line((3.5, -FILLET11_R), (3.5, 0))
            Line((3.5, 0), (3.5 + FILLET11_R, 0))
        make_face()
    revolve(axis=Axis((-8.660254038, 5, 5), (0, 0, 1)), mode=Mode.SUBTRACT)
    with BuildSketch(Plane(origin=(-8.660254038, -5, 5), x_dir=(1, 0, 0), z_dir=(0, -1, 0))) as fillet11_piece_33:
        with BuildLine():
            CenterArc((3.5 + FILLET11_R, -FILLET11_R), FILLET11_R, 90, 90)
            Line((3.5, -FILLET11_R), (3.5, 0))
            Line((3.5, 0), (3.5 + FILLET11_R, 0))
        make_face()
    revolve(axis=Axis((-8.660254038, -5, 5), (0, 0, 1)), mode=Mode.SUBTRACT)
    with BuildSketch(Plane(origin=(0, -10, 5), x_dir=(1, 0, 0), z_dir=(0, -1, 0))) as fillet11_piece_34:
        with BuildLine():
            CenterArc((3.5 + FILLET11_R, -FILLET11_R), FILLET11_R, 90, 90)
            Line((3.5, -FILLET11_R), (3.5, 0))
            Line((3.5, 0), (3.5 + FILLET11_R, 0))
        make_face()
    revolve(axis=Axis((0, -10, 5), (0, 0, 1)), mode=Mode.SUBTRACT)
    with BuildSketch(Plane(origin=(8.660254038, -5, 5), x_dir=(1, 0, 0), z_dir=(0, -1, 0))) as fillet11_piece_35:
        with BuildLine():
            CenterArc((3.5 + FILLET11_R, -FILLET11_R), FILLET11_R, 90, 90)
            Line((3.5, -FILLET11_R), (3.5, 0))
            Line((3.5, 0), (3.5 + FILLET11_R, 0))
        make_face()
    revolve(axis=Axis((8.660254038, -5, 5), (0, 0, 1)), mode=Mode.SUBTRACT)
    with BuildSketch(Plane(origin=(8.660254038, 5, 5), x_dir=(1, 0, 0), z_dir=(0, -1, 0))) as fillet11_piece_36:
        with BuildLine():
            CenterArc((3.5 + FILLET11_R, -FILLET11_R), FILLET11_R, 90, 90)
            Line((3.5, -FILLET11_R), (3.5, 0))
            Line((3.5, 0), (3.5 + FILLET11_R, 0))
        make_face()
    revolve(axis=Axis((8.660254038, 5, 5), (0, 0, 1)), mode=Mode.SUBTRACT)
    with BuildSketch(Plane(origin=(0, 0, 5), x_dir=(1, 0, 0), z_dir=(0, -1, 0))) as fillet11_piece_37:
        with BuildLine():
            CenterArc((3.5 + FILLET11_R, -FILLET11_R), FILLET11_R, 90, 90)
            Line((3.5, -FILLET11_R), (3.5, 0))
            Line((3.5, 0), (3.5 + FILLET11_R, 0))
        make_face()
    revolve(axis=Axis((0, 0, 5), (0, 0, 1)), mode=Mode.SUBTRACT)
    with BuildSketch(Plane(origin=(0, 10, 5), x_dir=(1, 0, 0), z_dir=(0, -1, 0))) as fillet11_piece_38:
        with BuildLine():
            CenterArc((3.5 + FILLET11_R, -FILLET11_R), FILLET11_R, 90, 90)
            Line((3.5, -FILLET11_R), (3.5, 0))
            Line((3.5, 0), (3.5 + FILLET11_R, 0))
        make_face()
    revolve(axis=Axis((0, 10, 5), (0, 0, 1)), mode=Mode.SUBTRACT)


solid = part.part
